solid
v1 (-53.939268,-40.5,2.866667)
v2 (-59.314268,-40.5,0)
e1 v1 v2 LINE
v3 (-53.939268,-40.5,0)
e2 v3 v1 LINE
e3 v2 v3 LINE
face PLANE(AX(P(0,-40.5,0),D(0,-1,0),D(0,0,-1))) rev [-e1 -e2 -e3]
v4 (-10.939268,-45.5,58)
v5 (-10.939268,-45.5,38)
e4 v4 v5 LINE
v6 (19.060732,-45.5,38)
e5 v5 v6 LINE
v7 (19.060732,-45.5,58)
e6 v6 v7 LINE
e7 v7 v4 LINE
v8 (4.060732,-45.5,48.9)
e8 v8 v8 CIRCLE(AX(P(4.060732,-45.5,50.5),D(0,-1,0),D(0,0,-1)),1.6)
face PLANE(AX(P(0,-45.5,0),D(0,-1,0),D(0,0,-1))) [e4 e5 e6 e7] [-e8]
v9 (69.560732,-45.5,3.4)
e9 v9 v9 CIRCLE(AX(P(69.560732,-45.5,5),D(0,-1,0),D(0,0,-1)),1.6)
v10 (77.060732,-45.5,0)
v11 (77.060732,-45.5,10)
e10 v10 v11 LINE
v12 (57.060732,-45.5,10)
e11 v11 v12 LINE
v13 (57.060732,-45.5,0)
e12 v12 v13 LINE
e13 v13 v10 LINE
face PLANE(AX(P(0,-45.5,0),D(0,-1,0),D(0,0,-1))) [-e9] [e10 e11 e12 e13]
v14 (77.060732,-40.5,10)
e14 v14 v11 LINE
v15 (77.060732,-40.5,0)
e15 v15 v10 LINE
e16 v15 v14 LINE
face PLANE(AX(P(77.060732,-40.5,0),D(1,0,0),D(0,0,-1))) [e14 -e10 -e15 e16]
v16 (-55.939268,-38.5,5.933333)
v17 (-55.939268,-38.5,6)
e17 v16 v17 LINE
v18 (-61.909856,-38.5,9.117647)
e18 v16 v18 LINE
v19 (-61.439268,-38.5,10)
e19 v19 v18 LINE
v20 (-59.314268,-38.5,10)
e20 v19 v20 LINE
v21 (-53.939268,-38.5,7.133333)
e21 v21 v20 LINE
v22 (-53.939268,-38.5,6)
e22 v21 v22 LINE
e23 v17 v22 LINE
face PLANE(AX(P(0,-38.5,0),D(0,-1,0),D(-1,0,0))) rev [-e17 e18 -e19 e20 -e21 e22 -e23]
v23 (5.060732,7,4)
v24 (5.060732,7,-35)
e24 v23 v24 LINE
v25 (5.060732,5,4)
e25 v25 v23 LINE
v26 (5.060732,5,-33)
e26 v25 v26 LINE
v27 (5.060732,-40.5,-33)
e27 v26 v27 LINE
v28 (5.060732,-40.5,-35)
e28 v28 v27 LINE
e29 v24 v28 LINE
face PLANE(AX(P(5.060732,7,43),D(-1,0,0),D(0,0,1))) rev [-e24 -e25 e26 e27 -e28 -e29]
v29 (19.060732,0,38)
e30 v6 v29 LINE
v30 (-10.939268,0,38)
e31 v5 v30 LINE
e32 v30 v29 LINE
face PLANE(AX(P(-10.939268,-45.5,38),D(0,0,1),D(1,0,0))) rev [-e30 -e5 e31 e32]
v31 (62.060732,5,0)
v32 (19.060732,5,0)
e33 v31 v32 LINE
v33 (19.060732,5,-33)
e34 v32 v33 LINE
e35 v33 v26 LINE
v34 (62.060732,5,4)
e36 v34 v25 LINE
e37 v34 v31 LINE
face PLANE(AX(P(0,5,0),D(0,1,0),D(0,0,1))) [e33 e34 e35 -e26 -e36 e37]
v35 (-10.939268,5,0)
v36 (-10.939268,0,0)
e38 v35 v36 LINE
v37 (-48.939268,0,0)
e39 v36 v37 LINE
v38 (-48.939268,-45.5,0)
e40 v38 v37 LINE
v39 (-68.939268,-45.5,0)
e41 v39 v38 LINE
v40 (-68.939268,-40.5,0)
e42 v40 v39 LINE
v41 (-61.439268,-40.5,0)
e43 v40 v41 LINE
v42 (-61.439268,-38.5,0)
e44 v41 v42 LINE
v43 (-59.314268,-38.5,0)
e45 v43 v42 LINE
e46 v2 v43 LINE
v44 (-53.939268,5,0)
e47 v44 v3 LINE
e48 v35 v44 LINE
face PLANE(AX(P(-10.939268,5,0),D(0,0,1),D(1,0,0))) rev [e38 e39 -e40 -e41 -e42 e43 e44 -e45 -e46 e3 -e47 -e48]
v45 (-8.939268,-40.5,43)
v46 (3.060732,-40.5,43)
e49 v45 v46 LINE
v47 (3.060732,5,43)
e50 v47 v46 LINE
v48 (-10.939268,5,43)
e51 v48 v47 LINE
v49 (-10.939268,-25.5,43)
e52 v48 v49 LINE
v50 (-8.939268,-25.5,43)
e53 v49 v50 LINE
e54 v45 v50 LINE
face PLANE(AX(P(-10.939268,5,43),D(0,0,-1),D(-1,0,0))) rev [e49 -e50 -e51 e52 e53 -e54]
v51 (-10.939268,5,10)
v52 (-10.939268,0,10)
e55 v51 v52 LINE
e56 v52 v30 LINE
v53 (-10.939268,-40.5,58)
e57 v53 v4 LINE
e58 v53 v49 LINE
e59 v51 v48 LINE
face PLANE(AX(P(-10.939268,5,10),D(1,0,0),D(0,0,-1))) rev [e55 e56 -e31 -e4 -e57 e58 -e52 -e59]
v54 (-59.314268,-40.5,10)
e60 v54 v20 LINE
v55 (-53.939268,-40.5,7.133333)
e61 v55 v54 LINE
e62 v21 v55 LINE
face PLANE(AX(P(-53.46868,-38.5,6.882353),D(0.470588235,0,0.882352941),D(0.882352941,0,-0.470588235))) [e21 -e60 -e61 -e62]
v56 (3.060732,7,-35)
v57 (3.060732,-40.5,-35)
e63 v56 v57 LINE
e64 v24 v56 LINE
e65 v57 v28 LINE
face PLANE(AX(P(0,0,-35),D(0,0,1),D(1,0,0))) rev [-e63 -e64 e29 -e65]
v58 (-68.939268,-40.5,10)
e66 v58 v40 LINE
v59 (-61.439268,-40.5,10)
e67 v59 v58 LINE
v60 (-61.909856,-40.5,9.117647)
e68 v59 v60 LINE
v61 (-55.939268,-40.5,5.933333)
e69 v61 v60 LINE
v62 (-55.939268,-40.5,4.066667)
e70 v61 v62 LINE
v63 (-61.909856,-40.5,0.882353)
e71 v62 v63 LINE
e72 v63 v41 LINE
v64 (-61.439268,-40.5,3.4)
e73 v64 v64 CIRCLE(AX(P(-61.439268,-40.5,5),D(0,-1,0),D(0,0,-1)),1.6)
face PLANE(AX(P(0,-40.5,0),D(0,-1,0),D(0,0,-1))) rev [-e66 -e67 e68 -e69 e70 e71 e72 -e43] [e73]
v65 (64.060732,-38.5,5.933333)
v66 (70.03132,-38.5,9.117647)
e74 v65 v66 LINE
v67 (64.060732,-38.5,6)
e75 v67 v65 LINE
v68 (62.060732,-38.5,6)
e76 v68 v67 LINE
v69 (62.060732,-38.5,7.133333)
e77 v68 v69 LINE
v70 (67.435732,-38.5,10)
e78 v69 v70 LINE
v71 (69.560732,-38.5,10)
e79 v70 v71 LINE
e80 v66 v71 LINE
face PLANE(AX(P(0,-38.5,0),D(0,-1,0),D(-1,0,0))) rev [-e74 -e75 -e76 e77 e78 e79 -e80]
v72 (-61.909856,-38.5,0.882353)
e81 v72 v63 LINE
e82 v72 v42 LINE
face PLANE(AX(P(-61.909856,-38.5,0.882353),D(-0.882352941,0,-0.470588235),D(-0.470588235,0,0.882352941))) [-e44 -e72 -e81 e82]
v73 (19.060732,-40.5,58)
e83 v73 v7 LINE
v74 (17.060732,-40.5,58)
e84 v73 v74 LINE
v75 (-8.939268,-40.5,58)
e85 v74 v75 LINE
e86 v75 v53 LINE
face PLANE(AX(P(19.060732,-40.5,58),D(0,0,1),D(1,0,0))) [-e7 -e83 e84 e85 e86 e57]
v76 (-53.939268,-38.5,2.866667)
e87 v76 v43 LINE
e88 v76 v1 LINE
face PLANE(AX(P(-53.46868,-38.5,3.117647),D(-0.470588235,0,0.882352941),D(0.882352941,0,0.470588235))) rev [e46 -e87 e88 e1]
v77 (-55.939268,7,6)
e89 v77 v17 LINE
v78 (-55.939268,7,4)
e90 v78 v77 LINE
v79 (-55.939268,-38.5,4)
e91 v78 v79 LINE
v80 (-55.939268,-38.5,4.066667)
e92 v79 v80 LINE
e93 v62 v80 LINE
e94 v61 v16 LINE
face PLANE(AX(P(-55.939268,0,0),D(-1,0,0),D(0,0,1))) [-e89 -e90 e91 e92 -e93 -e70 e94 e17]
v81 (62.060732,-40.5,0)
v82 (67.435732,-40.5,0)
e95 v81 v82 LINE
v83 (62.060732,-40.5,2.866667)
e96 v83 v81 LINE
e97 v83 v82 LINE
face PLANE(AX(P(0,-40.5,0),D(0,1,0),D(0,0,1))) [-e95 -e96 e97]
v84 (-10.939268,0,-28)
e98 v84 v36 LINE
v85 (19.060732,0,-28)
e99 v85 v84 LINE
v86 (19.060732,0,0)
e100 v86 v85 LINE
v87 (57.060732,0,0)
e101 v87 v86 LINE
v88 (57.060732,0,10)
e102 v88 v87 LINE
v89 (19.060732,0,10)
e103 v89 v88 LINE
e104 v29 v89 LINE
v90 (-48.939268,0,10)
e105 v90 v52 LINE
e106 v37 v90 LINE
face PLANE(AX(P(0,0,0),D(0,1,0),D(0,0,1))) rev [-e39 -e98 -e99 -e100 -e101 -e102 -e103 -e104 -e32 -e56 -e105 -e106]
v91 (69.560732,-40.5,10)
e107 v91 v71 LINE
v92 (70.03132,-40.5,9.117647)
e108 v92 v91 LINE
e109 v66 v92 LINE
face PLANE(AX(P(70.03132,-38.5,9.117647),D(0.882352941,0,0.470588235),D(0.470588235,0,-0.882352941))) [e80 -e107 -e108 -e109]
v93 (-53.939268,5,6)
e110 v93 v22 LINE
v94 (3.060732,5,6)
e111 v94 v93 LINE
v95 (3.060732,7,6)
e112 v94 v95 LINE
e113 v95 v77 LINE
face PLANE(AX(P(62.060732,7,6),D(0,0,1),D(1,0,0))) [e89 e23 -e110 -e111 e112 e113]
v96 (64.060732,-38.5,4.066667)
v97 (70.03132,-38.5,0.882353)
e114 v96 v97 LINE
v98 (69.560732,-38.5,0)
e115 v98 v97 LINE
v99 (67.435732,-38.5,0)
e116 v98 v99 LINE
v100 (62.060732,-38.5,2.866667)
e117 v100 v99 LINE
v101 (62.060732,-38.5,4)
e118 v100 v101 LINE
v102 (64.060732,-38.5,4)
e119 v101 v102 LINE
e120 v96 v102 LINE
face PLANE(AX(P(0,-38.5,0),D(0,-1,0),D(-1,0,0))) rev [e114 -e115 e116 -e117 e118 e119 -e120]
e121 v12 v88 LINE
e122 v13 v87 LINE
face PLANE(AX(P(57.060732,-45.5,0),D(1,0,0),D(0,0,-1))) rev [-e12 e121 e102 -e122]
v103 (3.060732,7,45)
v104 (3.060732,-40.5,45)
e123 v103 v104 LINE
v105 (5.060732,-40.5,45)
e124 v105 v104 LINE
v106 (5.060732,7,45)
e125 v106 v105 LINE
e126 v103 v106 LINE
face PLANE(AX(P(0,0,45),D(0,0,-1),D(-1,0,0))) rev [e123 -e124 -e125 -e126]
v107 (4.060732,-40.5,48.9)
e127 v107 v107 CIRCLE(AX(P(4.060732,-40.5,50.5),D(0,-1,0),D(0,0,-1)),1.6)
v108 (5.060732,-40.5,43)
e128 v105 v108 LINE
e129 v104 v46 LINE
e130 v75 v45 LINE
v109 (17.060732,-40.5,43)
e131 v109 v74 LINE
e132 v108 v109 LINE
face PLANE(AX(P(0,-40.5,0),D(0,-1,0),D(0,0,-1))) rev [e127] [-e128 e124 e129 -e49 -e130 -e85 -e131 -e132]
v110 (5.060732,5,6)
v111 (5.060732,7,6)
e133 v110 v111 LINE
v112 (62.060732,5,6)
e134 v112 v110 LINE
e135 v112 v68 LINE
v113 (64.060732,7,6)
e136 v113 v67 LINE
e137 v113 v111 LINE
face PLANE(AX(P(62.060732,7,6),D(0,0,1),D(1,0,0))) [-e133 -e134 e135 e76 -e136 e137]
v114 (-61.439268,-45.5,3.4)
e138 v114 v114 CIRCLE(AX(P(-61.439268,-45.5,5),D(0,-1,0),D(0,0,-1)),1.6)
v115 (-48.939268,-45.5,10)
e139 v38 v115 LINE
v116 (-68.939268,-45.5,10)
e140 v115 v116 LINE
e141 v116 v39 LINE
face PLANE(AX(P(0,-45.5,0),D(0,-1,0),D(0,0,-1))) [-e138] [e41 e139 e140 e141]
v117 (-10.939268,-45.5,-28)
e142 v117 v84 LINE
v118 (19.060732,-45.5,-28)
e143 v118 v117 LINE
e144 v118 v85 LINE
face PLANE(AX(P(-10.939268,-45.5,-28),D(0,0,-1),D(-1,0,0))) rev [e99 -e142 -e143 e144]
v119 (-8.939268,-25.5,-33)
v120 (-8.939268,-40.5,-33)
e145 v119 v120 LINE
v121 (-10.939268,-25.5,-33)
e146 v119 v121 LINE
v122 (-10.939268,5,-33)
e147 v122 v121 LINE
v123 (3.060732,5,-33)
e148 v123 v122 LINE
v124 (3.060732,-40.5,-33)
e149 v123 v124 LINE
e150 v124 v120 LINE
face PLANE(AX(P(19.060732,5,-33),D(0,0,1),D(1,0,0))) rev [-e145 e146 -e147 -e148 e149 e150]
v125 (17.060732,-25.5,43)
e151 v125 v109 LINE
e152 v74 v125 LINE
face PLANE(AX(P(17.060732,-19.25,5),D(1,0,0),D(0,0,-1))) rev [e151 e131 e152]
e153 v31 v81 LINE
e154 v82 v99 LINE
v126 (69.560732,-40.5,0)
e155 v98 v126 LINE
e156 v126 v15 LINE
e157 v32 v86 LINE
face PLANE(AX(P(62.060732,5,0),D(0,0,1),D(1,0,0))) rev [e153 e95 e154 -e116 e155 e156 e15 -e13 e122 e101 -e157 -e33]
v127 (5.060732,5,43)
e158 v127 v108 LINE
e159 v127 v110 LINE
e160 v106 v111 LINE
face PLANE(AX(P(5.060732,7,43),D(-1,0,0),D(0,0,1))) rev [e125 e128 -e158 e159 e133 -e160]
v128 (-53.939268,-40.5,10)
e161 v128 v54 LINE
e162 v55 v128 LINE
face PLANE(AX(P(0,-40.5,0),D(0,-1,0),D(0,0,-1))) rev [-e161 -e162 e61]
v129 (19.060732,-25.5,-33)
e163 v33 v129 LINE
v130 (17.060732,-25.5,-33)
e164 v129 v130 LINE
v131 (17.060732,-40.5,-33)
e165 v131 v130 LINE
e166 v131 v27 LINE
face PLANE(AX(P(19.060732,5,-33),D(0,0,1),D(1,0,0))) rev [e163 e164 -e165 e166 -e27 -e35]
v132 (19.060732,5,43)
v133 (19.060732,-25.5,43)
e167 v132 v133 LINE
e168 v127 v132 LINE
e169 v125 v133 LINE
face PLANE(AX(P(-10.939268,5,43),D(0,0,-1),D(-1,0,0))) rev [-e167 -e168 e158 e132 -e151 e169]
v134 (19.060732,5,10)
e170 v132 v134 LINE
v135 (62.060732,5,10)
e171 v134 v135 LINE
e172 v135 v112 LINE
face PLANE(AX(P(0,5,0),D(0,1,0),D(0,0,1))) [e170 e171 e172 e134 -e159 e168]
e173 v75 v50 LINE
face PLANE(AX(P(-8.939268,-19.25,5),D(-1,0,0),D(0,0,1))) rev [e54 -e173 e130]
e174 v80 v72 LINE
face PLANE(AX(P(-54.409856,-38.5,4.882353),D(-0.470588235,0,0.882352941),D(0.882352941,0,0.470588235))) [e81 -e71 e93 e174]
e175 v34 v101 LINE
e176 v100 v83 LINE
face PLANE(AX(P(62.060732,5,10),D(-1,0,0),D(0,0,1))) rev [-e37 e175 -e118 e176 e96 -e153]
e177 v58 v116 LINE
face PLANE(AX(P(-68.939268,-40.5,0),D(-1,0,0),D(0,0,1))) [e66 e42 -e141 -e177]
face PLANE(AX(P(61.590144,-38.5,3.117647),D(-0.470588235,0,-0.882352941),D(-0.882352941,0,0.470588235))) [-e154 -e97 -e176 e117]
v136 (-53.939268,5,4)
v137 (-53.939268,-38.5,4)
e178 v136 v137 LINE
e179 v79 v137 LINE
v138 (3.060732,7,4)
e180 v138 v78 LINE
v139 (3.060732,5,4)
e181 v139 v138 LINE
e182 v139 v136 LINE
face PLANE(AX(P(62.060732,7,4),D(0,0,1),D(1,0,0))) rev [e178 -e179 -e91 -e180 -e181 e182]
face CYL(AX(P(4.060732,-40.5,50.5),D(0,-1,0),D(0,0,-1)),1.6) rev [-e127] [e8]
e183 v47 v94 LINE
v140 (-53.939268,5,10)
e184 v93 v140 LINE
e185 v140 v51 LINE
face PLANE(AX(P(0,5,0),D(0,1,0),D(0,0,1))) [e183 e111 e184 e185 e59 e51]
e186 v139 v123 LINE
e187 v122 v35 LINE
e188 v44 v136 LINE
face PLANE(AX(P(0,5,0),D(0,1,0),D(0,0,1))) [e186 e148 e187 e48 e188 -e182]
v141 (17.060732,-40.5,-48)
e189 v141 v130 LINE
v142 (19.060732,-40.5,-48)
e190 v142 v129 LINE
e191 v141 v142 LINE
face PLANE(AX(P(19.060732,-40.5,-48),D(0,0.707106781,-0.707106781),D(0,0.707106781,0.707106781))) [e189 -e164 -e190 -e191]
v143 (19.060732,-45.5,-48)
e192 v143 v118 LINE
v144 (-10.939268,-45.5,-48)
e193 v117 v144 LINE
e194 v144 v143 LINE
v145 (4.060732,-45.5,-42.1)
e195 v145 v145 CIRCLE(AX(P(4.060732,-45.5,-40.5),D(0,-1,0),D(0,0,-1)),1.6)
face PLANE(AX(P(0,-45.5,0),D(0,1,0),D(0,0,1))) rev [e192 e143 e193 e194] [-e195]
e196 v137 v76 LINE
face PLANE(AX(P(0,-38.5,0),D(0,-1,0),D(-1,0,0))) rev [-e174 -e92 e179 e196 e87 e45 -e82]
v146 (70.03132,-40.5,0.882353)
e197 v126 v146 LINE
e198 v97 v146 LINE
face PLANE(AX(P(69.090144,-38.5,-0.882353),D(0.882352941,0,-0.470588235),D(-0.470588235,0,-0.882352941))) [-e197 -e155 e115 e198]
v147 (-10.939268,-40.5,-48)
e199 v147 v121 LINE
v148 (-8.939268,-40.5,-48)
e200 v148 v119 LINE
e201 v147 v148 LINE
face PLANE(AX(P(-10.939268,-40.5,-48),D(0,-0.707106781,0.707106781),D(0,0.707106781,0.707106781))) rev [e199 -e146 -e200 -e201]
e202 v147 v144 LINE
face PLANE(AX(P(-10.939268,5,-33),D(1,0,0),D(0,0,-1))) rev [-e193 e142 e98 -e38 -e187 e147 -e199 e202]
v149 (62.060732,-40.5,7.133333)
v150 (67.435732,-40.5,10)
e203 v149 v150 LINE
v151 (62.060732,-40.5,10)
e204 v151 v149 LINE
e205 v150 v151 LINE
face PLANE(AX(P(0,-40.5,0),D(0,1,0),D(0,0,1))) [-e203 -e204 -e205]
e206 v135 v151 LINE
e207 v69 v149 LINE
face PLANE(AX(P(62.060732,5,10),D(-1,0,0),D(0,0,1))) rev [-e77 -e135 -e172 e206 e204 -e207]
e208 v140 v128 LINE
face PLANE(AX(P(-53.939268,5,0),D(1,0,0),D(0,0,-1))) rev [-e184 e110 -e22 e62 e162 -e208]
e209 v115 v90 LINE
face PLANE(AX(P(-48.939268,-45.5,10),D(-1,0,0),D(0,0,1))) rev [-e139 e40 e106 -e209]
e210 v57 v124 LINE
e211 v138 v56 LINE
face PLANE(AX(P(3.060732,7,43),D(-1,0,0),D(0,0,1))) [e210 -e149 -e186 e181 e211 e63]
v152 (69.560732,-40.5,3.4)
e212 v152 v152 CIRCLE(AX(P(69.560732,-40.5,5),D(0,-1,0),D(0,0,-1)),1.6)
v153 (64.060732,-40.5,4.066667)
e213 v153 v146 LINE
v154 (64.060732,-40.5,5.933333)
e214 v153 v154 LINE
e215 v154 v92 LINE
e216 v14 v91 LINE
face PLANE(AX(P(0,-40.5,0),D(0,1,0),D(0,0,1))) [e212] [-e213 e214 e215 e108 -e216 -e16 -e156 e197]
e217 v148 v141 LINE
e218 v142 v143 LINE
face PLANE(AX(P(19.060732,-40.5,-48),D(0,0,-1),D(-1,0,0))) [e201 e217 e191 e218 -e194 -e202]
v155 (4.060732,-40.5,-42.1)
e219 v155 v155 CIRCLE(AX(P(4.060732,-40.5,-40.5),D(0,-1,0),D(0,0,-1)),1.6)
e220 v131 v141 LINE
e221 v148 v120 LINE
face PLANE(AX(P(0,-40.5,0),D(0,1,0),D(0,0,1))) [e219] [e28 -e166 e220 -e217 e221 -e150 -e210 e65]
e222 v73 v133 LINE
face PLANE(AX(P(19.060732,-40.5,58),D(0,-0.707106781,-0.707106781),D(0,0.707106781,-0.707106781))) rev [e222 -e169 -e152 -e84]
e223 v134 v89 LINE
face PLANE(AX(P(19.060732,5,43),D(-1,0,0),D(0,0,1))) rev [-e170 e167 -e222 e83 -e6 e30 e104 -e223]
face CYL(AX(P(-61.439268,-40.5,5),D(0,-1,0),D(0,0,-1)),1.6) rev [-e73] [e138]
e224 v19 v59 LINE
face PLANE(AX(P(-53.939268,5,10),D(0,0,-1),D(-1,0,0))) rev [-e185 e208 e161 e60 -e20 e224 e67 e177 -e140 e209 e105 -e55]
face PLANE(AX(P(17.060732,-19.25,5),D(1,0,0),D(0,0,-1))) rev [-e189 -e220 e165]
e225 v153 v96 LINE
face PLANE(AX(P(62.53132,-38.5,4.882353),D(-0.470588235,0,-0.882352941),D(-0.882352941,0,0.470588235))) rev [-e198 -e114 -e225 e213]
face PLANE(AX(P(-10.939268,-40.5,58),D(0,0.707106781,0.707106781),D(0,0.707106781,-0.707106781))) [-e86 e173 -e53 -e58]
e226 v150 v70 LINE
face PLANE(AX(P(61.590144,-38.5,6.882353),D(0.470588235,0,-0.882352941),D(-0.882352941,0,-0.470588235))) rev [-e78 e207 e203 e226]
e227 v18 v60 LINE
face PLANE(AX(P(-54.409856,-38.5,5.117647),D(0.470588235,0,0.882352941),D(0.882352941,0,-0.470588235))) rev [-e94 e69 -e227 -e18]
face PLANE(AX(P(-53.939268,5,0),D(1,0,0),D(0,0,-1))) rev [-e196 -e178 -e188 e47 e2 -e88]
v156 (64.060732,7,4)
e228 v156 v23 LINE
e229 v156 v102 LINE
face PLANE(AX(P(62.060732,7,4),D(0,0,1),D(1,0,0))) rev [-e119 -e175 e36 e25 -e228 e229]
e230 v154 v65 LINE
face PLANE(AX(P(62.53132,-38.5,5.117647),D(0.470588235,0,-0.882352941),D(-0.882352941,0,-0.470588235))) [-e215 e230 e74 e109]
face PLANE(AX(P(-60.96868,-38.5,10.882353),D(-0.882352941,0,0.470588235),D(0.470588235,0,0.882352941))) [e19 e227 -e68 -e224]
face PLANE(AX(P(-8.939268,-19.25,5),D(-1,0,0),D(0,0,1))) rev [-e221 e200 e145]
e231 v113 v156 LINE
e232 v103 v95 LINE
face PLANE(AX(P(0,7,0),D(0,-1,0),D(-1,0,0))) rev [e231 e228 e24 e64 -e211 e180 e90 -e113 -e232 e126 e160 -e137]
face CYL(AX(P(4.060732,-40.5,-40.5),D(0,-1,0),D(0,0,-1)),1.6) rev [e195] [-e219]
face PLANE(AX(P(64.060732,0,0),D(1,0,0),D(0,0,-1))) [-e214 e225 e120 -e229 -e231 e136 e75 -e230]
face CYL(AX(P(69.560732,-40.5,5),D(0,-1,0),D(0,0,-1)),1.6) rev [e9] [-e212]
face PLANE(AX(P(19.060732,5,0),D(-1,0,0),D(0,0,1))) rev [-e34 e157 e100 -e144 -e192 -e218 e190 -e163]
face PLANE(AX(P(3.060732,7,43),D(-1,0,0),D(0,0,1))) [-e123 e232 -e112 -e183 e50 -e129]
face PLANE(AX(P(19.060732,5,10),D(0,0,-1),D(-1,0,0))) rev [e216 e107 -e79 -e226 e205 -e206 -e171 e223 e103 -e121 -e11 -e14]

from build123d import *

# Parameters (mm, degrees)
BOSS_EXTRUDE1_DEPTH = 5
SKETCH2_W           = 5
SKETCH2_H           = 10
SKETCH2_W_2         = 30
SKETCH2_H_2         = 5
BOSS_EXTRUDE2_DEPTH = 45.5
SKETCH3_W           = 30
SKETCH3_H           = 15
SKETCH3_R           = 1.6
SKETCH3_W_2         = 15
SKETCH3_H_2         = 10
BOSS_EXTRUDE3_DEPTH = 5
SKETCH4_W           = 2
SKETCH4_H           = 76
SKETCH4_W_2         = 116
SKETCH4_H_2         = 2
EXTRUDE_THIN1_DEPTH = 2
SKETCH5_W           = 2
SKETCH5_H           = 47.5
EXTRUDE_THIN2_DEPTH = 2
SKETCH6_W           = 2
SKETCH6_H           = 47.5
EXTRUDE_THIN3_DEPTH = 2
SKETCH7_W           = 2
SKETCH7_H           = 47.5
EXTRUDE_THIN4_DEPTH = 2
SKETCH8_W           = 2
SKETCH8_H           = 47.5
EXTRUDE_THIN5_DEPTH = 2
RIB2_REACH          = 116.797
SKETCH9_WALL_W      = 252.8063218
SKETCH9_WALL_H      = 2
RIB3_START          = -2
RIB3_DEPTH          = 2
RIB5_REACH          = 116.797
SKETCH11_WALL_W     = 252.8063218
SKETCH11_WALL_H     = 2
RIB6_START          = -2
RIB6_DEPTH          = 2
EXTRUDE_THIN6_DEPTH = 2
SKETCH16_W          = 3.138831492
SKETCH16_H          = 8.051178831
SKETCH16_W_2        = 2.588504754
SKETCH16_H_2        = 9.327196591
CUT_EXTRUDE1_DEPTH  = 164.555036608


# Read off the part's stored shape, not the designer's step: Boss-Extrude1, Rib3, Rib6
with BuildPart() as part:
    # Boss-Extrude1 outline → Boss-Extrude1 (new body)
    with BuildSketch(Plane(origin=(0, 0, 0), x_dir=(1, 0, 0), z_dir=(0, 1, 0))):
        Polygon((19.060732093, 33), (-10.939267907, 33), (-10.939267907, 0), (-53.939267907, 0), (-53.939267907, -10), (-10.939267907, -10), (-10.939267907, -43), (19.060732093, -43), (19.060732093, -10), (62.060732093, -10), (62.060732093, 0), (19.060732093, 0), align=None)
    extrude(amount=BOSS_EXTRUDE1_DEPTH)

    # Sketch2 → Boss-Extrude2 (add)
    with BuildSketch(Plane.XZ):
        with Locations((-51.439267907, 5)):
            Rectangle(SKETCH2_W, SKETCH2_H)
        with Locations((4.060732093, 40.5)):
            Rectangle(SKETCH2_W_2, SKETCH2_H_2)
        with Locations((4.060732093, -30.5)):
            Rectangle(SKETCH2_W_2, SKETCH2_H_2)
        with Locations((59.560732093, 5)):
            Rectangle(SKETCH2_W, SKETCH2_H)
    extrude(amount=BOSS_EXTRUDE2_DEPTH)

    # Sketch3 → Boss-Extrude3 (add)
    # profile 1 of 4: a face of its own
    with BuildSketch(Plane.XZ.offset(45.5)):
        with Locations((4.060732093, 50.5)):
            Rectangle(SKETCH3_W, SKETCH3_H)
        with Locations(Location((4.060732093, 50.5, 0), (0, 0, 270))):
            Circle(SKETCH3_R, mode=Mode.SUBTRACT)
    # profile 2 of 4: a face of its own
    with BuildSketch(Plane.XZ.offset(45.5)):
        with Locations((69.560732093, 5)):
            Rectangle(SKETCH3_W_2, SKETCH3_H_2)
        with Locations(Location((69.560732093, 5, 0), (0, 0, 270))):
            Circle(SKETCH3_R, mode=Mode.SUBTRACT)
    # profile 3 of 4: a face of its own
    with BuildSketch(Plane.XZ.offset(45.5)):
        with Locations((4.060732093, -40.5)):
            Rectangle(SKETCH3_W, SKETCH3_H)
        with Locations(Location((4.060732093, -40.5, 0), (0, 0, 270))):
            Circle(SKETCH3_R, mode=Mode.SUBTRACT)
    # profile 4 of 4: a face of its own
    with BuildSketch(Plane.XZ.offset(45.5)):
        with Locations((-61.439267907, 5)):
            Rectangle(SKETCH3_W_2, SKETCH3_H_2)
        with Locations(Location((-61.439267907, 5, 0), (0, 0, 270))):
            Circle(SKETCH3_R, mode=Mode.SUBTRACT)
    extrude(amount=-BOSS_EXTRUDE3_DEPTH)

    # Sketch4 → Extrude-Thin1 (add)
    with BuildSketch(Plane(origin=(0, 5, 0), x_dir=(1, 0, 0), z_dir=(0, 1, 0))):
        with Locations((4.060732093, -5)):
            Rectangle(SKETCH4_W, SKETCH4_H)
        with Locations((4.060732093, -5)):
            Rectangle(SKETCH4_W_2, SKETCH4_H_2)
    extrude(amount=EXTRUDE_THIN1_DEPTH)

    # Sketch5 → Extrude-Thin2 (add)
    with BuildSketch(Plane.ZY.offset(53.939267907)):
        with Locations((5, -16.75)):
            Rectangle(SKETCH5_W, SKETCH5_H)
    extrude(amount=EXTRUDE_THIN2_DEPTH)

    # Sketch6 → Extrude-Thin3 (add)
    with BuildSketch(Plane(origin=(62.060732093, 0, 0), x_dir=(0, 0, -1), z_dir=(1, 0, 0))):
        with Locations((-5, -16.75)):
            Rectangle(SKETCH6_W, SKETCH6_H)
    extrude(amount=EXTRUDE_THIN3_DEPTH)

    # Sketch7 → Extrude-Thin4 (add)
    with BuildSketch(Plane.XY.offset(43)):
        with Locations((4.060732093, -16.75)):
            Rectangle(SKETCH7_W, SKETCH7_H)
    extrude(amount=EXTRUDE_THIN4_DEPTH)

    # Sketch8 → Extrude-Thin5 (add)
    with BuildSketch(Plane(origin=(0, 0, -33), x_dir=(-1, 0, 0), z_dir=(0, 0, -1))):
        with Locations((-4.060732093, -16.75)):
            Rectangle(SKETCH8_W, SKETCH8_H)
    extrude(amount=EXTRUDE_THIN5_DEPTH)

    # Sketch9 wall → Rib2 (add, up to next)
    with BuildSketch(Plane(origin=(-10.939267907, -33, 50.5), x_dir=(0, 0.707106781187, -0.707106781187), z_dir=(0, -0.707106781187, -0.707106781187)), mode=Mode.PRIVATE) as rib2_sk1:
        with Locations((0, 1)):
            Rectangle(SKETCH9_WALL_W, SKETCH9_WALL_H)
    rib2_tool1 = extrude(rib2_sk1.sketch, amount=RIB2_REACH, mode=Mode.PRIVATE) - part.part
    add(rib2_tool1.solids().sort_by_distance((-10.939267907, -33, 50.5))[0])

    # Rib3 outline → Rib3 (add)
    with BuildSketch(Plane(origin=(19.060732093, 0, 0), x_dir=(0, 0, -1), z_dir=(1, 0, 0)).offset(RIB3_START)):
        Polygon((-43, -25.5), (-58, -40.5), (-43, -40.5), align=None)
    extrude(amount=RIB3_DEPTH)

    # Sketch11 wall → Rib5 (add, up to next)
    with BuildSketch(Plane(origin=(19.060732093, -33, -40.5), x_dir=(0, 0.707106781187, 0.707106781187), z_dir=(0, -0.707106781187, 0.707106781187)), mode=Mode.PRIVATE) as rib5_sk1:
        with Locations((0, 1)):
            Rectangle(SKETCH11_WALL_W, SKETCH11_WALL_H)
    rib5_tool1 = extrude(rib5_sk1.sketch, amount=RIB5_REACH, mode=Mode.PRIVATE) - part.part
    add(rib5_tool1.solids().sort_by_distance((19.060732093, -33, -40.5))[0])

    # Rib6 outline → Rib6 (add)
    with BuildSketch(Plane.ZY.offset(10.939267907).offset(RIB6_START)):
        Polygon((-33, -25.5), (-48, -40.5), (-33, -40.5), align=None)
    extrude(amount=RIB6_DEPTH)

    # Sketch15 → Extrude-Thin6 (add)
    with BuildSketch(Plane(origin=(0, -40.5, 0), x_dir=(1, 0, 0), z_dir=(0, 1, 0))):
        Polygon((-53.468679672, -3.117647059), (-60.968679672, 0.882352941), (-61.909856142, -0.882352941), (-54.409856142, -4.882352941), align=None)
        Polygon((-54.409856142, -5.117647059), (-61.909856142, -9.117647059), (-60.968679672, -10.882352941), (-53.468679672, -6.882352941), align=None)
        Polygon((62.531320328, -4.882352941), (70.031320328, -0.882352941), (69.090143858, 0.882352941), (61.590143858, -3.117647059), align=None)
        Polygon((61.590143858, -6.882352941), (69.090143858, -10.882352941), (70.031320328, -9.117647059), (62.531320328, -5.117647059), align=None)
    extrude(amount=EXTRUDE_THIN6_DEPTH)

    # Sketch16 → Cut-Extrude1 (cut, through all)
    with BuildSketch(Plane(origin=(77.060732093, 0, 0), x_dir=(0, 0, -1), z_dir=(1, 0, 0))):
        with Locations((-11.569415746, -41.474410585)):
            Rectangle(SKETCH16_W, SKETCH16_H)
        with Locations((1.294252377, -40.836401705)):
            Rectangle(SKETCH16_W_2, SKETCH16_H_2)
    extrude(amount=-CUT_EXTRUDE1_DEPTH, mode=Mode.SUBTRACT)


solid = part.part
